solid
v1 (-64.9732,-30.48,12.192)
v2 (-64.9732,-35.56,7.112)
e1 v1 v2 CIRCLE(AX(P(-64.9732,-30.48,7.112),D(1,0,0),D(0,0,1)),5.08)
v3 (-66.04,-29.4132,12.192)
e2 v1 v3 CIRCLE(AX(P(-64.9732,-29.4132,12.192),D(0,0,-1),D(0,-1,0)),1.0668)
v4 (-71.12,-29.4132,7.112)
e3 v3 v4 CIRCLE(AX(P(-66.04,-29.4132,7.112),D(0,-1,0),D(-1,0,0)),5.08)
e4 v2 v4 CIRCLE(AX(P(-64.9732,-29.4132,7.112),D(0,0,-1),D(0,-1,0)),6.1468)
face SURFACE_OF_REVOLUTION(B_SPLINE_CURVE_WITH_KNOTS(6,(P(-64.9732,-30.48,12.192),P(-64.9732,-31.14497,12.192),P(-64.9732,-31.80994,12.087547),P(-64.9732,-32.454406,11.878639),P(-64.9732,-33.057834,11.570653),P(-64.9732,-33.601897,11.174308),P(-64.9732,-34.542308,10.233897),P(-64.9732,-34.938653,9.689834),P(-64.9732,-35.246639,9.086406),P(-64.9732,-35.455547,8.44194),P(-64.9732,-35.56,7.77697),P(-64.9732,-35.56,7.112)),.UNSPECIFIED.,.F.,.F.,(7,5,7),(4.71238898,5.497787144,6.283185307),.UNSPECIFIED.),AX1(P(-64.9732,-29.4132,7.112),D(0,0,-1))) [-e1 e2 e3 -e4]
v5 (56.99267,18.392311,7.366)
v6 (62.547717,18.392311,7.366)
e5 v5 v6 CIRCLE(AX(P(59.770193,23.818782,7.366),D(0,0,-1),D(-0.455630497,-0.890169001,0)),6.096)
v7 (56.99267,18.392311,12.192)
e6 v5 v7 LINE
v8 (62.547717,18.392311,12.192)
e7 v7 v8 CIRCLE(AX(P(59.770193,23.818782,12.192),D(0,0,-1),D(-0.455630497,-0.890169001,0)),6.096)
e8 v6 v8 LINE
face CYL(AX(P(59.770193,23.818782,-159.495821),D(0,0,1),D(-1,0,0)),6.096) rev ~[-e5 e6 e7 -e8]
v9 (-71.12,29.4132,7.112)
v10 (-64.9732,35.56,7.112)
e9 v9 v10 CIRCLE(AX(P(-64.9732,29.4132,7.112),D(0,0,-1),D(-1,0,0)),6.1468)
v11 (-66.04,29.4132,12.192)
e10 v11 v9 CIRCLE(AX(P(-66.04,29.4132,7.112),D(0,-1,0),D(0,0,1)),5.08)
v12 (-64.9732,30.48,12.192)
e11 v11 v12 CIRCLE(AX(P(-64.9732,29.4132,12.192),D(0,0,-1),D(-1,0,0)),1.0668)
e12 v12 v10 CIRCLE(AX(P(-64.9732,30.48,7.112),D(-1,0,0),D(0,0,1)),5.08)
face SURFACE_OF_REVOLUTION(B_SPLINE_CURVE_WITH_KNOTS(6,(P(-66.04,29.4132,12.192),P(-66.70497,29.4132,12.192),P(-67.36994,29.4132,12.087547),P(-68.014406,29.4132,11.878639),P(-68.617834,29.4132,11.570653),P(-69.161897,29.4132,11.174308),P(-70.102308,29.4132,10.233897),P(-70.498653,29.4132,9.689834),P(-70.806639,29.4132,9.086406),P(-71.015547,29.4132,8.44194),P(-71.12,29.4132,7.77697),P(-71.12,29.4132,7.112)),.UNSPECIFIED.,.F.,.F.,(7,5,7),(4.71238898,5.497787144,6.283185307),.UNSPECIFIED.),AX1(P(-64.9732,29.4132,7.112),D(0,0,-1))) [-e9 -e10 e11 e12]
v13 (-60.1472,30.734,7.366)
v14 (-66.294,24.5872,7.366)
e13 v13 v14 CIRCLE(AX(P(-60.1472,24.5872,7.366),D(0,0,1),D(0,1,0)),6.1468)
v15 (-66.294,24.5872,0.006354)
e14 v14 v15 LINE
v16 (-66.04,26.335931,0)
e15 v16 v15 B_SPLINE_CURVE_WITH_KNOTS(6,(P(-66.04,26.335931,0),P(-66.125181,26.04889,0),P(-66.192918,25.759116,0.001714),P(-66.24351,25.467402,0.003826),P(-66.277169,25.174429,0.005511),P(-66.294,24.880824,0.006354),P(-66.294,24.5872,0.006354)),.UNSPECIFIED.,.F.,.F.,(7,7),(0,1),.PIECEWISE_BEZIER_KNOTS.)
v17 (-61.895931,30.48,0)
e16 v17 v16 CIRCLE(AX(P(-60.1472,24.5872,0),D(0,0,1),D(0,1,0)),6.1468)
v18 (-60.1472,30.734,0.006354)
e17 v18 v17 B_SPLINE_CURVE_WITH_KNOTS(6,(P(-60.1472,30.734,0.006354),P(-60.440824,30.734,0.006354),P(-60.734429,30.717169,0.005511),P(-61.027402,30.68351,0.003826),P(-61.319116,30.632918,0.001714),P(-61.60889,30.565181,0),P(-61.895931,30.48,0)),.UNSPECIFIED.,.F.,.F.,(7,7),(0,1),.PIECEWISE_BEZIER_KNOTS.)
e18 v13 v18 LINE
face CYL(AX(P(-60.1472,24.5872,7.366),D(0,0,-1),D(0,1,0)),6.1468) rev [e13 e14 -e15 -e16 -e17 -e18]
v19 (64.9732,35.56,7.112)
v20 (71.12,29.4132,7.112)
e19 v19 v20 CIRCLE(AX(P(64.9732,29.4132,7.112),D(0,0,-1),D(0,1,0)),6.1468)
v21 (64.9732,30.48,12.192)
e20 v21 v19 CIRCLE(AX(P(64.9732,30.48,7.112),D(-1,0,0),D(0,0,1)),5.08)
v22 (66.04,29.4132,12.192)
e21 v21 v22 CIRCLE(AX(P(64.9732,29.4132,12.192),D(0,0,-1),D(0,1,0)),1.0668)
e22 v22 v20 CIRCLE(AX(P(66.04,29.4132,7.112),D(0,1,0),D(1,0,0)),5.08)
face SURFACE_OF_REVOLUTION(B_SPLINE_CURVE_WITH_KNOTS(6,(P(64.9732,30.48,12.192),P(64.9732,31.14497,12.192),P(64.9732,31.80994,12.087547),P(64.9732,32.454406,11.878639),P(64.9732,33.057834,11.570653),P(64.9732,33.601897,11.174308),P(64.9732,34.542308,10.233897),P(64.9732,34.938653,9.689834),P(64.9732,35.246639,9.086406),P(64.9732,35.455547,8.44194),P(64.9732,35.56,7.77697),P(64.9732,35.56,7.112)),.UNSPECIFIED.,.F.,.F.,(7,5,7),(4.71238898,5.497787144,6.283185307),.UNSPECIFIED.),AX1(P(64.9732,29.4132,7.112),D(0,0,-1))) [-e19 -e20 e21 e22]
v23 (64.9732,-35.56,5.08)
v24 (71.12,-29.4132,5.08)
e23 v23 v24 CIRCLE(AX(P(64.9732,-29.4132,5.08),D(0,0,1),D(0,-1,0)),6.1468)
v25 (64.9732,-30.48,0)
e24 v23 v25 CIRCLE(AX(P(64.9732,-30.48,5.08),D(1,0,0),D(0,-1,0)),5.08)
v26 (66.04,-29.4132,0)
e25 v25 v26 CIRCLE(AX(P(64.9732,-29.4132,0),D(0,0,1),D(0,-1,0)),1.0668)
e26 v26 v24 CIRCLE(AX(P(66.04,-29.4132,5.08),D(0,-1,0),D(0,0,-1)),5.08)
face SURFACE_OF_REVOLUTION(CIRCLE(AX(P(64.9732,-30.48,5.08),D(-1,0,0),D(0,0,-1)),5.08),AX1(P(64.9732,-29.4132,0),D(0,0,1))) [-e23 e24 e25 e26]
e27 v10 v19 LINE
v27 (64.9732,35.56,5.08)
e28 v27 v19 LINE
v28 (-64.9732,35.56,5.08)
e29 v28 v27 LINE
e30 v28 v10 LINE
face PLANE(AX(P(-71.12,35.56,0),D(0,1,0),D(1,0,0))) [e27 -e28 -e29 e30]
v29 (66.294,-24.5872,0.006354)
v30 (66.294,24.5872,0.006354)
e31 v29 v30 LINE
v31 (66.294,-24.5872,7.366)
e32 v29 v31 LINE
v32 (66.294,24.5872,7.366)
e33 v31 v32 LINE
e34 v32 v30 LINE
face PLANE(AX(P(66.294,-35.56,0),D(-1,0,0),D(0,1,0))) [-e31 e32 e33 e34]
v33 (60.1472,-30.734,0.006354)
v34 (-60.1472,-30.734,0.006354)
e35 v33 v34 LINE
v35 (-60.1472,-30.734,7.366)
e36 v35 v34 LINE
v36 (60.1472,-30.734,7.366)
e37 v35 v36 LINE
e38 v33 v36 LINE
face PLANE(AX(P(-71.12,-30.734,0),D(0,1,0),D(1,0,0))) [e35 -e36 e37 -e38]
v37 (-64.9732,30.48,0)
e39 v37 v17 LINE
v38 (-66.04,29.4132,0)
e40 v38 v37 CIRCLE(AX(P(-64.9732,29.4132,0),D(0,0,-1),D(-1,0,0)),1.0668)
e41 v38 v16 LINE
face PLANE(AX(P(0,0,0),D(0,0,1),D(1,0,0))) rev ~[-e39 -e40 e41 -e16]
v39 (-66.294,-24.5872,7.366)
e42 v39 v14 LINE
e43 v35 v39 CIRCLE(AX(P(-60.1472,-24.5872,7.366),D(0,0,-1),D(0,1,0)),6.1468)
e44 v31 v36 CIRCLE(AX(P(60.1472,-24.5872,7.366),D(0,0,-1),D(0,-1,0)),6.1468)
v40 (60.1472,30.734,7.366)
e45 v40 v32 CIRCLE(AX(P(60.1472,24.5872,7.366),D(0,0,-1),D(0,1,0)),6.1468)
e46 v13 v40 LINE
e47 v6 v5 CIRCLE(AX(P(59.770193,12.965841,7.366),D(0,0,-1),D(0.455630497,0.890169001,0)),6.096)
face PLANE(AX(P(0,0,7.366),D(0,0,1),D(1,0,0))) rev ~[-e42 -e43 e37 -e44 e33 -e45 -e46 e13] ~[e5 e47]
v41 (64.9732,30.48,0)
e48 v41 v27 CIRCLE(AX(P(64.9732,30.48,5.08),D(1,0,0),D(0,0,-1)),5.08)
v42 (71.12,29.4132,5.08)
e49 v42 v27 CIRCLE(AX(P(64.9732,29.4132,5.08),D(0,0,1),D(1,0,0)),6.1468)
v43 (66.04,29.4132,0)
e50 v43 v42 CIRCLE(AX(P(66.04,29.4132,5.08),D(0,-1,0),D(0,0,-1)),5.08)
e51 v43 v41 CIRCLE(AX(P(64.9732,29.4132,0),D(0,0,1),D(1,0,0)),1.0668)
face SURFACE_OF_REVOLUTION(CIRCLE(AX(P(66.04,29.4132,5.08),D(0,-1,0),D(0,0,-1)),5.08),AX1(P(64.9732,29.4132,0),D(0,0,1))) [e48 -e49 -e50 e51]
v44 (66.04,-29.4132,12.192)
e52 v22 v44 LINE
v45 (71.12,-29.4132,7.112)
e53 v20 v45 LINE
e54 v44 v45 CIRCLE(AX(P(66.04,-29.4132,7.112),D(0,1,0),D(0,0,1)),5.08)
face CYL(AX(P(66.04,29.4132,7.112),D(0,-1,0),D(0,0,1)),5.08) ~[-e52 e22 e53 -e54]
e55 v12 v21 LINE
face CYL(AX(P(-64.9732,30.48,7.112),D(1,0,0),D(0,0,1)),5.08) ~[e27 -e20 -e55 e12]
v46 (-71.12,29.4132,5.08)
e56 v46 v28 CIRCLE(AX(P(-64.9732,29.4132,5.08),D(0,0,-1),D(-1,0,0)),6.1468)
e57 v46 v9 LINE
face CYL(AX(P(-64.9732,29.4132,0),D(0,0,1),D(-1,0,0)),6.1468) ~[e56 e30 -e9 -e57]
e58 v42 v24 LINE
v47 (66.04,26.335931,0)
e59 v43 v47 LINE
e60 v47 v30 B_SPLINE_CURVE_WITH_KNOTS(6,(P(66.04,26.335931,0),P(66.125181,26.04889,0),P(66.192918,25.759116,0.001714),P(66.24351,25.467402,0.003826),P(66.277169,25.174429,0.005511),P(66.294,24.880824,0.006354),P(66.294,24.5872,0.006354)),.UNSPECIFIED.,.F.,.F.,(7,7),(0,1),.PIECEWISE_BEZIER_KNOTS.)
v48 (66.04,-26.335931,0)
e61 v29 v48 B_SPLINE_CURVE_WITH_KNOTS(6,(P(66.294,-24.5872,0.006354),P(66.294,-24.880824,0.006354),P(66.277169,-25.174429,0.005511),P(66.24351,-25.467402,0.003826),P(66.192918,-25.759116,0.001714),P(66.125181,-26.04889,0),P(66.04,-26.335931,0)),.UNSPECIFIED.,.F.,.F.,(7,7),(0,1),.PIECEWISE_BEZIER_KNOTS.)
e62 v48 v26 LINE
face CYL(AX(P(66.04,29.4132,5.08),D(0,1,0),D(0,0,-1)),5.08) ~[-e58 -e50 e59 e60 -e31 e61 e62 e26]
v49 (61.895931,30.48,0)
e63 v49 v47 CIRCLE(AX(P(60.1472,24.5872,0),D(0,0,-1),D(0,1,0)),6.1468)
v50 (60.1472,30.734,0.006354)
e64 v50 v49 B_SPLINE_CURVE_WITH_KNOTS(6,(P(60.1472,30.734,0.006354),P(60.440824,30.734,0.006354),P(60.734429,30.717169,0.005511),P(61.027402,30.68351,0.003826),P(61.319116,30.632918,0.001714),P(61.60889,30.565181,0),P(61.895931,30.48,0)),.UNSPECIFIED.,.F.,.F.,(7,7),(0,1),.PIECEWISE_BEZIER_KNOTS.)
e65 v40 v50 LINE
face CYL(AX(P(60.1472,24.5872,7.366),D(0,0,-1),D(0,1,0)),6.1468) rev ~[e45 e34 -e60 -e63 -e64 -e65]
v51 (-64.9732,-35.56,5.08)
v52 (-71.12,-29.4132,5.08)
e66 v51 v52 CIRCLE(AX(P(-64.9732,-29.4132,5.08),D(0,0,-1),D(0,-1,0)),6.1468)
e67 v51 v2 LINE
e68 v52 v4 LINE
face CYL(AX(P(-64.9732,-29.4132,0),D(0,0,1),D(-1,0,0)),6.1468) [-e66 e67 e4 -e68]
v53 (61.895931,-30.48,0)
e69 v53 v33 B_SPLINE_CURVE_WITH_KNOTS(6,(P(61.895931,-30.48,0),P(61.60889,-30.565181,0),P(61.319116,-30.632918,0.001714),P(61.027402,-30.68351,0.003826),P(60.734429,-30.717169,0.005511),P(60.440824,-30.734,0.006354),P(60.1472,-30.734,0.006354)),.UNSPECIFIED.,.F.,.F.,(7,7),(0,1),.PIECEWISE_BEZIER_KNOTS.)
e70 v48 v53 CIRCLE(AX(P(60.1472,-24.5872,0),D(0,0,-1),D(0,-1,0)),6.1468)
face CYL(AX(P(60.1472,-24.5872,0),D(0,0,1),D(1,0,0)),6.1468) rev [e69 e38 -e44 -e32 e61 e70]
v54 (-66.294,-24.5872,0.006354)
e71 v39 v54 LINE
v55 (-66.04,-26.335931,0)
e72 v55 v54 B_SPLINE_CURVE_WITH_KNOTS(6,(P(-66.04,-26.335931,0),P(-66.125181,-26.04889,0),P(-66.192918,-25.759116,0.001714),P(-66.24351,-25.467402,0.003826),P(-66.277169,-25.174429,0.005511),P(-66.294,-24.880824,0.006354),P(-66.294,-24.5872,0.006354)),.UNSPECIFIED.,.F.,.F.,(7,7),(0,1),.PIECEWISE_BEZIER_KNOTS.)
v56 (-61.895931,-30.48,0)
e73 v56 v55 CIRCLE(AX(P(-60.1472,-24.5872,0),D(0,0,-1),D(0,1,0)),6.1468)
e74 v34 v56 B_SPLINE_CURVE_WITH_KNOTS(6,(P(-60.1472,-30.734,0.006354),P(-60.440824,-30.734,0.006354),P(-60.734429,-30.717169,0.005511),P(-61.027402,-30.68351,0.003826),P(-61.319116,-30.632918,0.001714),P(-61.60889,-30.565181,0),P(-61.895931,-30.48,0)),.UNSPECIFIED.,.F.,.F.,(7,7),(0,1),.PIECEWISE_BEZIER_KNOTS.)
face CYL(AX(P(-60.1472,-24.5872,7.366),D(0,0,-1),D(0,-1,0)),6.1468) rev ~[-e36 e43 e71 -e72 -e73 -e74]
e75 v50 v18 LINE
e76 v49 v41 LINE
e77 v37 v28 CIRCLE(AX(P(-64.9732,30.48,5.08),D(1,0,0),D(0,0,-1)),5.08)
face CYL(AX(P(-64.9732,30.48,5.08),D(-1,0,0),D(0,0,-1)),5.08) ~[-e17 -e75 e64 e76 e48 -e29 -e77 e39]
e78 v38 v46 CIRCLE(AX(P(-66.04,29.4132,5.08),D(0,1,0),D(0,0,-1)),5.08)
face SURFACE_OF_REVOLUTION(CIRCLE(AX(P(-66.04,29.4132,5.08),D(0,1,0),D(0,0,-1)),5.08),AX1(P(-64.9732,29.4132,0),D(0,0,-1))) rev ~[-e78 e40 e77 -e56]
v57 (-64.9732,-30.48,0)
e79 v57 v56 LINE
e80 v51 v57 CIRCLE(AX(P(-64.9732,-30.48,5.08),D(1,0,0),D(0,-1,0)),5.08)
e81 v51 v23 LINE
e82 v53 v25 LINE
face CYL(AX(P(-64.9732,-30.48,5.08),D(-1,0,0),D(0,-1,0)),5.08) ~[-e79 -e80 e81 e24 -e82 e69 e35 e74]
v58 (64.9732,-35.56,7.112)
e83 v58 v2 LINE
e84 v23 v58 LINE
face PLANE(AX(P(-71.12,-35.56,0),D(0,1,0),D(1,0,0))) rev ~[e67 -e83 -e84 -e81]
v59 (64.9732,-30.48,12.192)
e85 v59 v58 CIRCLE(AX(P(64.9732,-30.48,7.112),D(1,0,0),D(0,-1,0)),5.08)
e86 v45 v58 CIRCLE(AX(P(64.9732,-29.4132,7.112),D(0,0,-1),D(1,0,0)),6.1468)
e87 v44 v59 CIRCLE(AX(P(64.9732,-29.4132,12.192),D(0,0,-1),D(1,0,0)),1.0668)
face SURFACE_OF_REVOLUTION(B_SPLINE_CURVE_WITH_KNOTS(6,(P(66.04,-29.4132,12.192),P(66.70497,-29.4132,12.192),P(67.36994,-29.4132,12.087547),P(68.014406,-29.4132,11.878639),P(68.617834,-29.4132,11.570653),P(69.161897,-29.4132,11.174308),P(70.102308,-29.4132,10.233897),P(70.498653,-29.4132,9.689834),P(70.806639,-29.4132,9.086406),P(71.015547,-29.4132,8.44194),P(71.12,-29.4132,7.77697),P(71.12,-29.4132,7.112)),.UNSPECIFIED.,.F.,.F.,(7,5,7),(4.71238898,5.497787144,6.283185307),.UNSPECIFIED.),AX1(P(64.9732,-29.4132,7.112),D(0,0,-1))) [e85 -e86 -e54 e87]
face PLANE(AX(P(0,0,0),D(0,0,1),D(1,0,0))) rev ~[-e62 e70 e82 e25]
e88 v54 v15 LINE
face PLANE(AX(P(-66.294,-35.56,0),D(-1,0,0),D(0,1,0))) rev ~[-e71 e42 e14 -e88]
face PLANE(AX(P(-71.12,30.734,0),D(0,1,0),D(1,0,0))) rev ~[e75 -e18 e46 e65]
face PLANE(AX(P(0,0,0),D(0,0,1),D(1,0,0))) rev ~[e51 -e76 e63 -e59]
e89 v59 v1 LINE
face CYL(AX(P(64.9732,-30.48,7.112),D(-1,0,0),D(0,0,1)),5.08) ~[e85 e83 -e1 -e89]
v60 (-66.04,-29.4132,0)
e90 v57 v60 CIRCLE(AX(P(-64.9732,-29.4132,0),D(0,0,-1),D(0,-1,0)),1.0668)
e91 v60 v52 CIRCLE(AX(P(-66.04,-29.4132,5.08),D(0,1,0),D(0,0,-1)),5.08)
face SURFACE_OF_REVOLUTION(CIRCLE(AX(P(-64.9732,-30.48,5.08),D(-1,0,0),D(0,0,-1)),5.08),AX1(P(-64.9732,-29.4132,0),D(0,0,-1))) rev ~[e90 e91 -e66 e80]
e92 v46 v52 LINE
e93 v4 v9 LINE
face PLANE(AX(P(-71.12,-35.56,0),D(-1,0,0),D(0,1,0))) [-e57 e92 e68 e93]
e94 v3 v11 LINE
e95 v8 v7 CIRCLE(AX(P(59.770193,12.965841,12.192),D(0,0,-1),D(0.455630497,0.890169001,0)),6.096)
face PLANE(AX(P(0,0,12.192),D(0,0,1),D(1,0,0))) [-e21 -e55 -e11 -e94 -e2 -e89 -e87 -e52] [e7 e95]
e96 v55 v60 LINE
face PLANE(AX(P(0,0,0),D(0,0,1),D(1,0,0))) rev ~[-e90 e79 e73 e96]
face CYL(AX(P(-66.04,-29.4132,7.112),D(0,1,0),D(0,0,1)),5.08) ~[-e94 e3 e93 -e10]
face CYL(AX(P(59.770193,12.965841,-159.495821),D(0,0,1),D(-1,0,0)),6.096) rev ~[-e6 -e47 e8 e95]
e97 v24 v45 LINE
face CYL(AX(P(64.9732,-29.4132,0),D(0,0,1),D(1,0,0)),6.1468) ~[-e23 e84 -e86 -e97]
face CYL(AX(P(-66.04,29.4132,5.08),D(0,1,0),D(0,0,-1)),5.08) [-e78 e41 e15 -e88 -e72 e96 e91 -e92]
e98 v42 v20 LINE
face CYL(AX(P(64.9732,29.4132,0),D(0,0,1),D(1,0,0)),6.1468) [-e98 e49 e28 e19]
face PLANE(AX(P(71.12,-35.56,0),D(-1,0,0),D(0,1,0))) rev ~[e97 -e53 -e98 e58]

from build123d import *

# Parameters (mm, degrees)
F0_W         = 142.24
F0_H         = 71.12
F1_DEPTH     = 12.192
F3_T         = -4.826
F4_D         = 12.192
F5_R         = 6.1468
F6_T1_DEPTH  = 129.9464
F6_T3_DEPTH  = 58.8264
F6_T6_ANGLE  = 90
F6_T8_ANGLE  = 90
F6_T10_ANGLE = 90
F6_T12_ANGLE = 90
F7_R         = 5.08


# Not quite as in the source:
# - a fillet or chamfer that OpenCascade refuses, or shapes differently, is made with other operations: its cross-section is extruded or revolved along the edge and cut away or added
# - a feature names something its author has since deleted; it is built from what else it names


with BuildPart() as f1:
    # F0 (on Top) → F1 (new body)
    with BuildSketch(Plane.XY):
        Rectangle(F0_W, F0_H)
    extrude(amount=F1_DEPTH)

    # F3
    f3_openings = [f1.faces().sort_by_distance(p)[0] for p in [
        (0, 0, 0),
    ]]
    offset(amount=F3_T, openings=f3_openings)

    # F4 (through all)
    with Locations(Plane(origin=(0, 0, 0), x_dir=(1, 0, 0), z_dir=(0, 0, -1))):
        with Locations((59.7701932977, -12.9658412188), (59.7701932977, -23.8187816803)):
            Hole(F4_D / 2)

    # F5
    f5_edges = [f1.edges().sort_by_distance(p)[0] for p in [
        (66.294, -30.734, 3.683),
        (66.294, 30.734, 3.683),
        (-66.294, 30.734, 3.683),
        (-66.294, -30.734, 3.683),
        (-71.12, 35.56, 6.096),
        (-71.12, -35.56, 6.096),
        (71.12, -35.56, 6.096),
        (71.12, 35.56, 6.096),
    ]]
    fillet(f5_edges, radius=F5_R)

    # F6: fillet of radius 5.08 on 1 edges, made by hand

    # F6_s2 → F6_t1 (cut)
    with BuildSketch(Plane.YZ.offset(-64.9732)):
        with BuildLine():
            ThreePointArc((30.48, 0), (34.0721024484, 1.4878975516), (35.56, 5.08))
            Line((35.56, 5.08), (35.56, 0))
            Line((35.56, 0), (30.48, 0))
        make_face()
        with BuildLine():
            ThreePointArc((-35.56, 5.08), (-34.0721024484, 1.4878975516), (-30.48, 0))
            Line((-30.48, 0), (-35.56, 0))
            Line((-35.56, 0), (-35.56, 5.08))
        make_face()
    extrude(amount=F6_T1_DEPTH, mode=Mode.SUBTRACT)

    # F6_s4 → F6_t3 (cut)
    with BuildSketch(Plane.XZ.offset(-29.4132)):
        with BuildLine():
            ThreePointArc((-66.04, 0), (-69.6321024484, 1.4878975516), (-71.12, 5.08))
            Line((-71.12, 5.08), (-71.12, 0))
            Line((-71.12, 0), (-66.04, 0))
        make_face()
        with BuildLine():
            ThreePointArc((66.04, 0), (69.6321024484, 1.4878975516), (71.12, 5.08))
            Line((71.12, 5.08), (71.12, 0))
            Line((71.12, 0), (66.04, 0))
        make_face()
    extrude(amount=F6_T3_DEPTH, mode=Mode.SUBTRACT)

    # F6_s5 → F6_t6 (revolve, cut)
    with BuildSketch(Plane.XZ.offset(-29.4132)):
        with BuildLine():
            ThreePointArc((66.04, 0), (69.6321024484, 1.4878975516), (71.12, 5.08))
            Line((71.12, 5.08), (71.12, 0))
            Line((71.12, 0), (66.04, 0))
        make_face()
    revolve(axis=Axis((64.9732, 29.4132, 0), (0, 0, 1)), revolution_arc=F6_T6_ANGLE, mode=Mode.SUBTRACT)

    # F6_s7 → F6_t8 (revolve, cut)
    with BuildSketch(Plane.XZ.offset(-29.4132)):
        with BuildLine():
            ThreePointArc((-66.04, 0), (-69.6321024484, 1.4878975516), (-71.12, 5.08))
            Line((-71.12, 5.08), (-71.12, 0))
            Line((-71.12, 0), (-66.04, 0))
        make_face()
    revolve(axis=Axis((-64.9732, 29.4132, 0), (0, 0, -1)), revolution_arc=F6_T8_ANGLE, mode=Mode.SUBTRACT)

    # F6_s9 → F6_t10 (revolve, cut)
    with BuildSketch(Plane.YZ.offset(-64.9732)):
        with BuildLine():
            ThreePointArc((-30.48, 0), (-34.0721024484, 1.4878975516), (-35.56, 5.08))
            Line((-35.56, 5.08), (-35.56, 0))
            Line((-35.56, 0), (-30.48, 0))
        make_face()
    revolve(axis=Axis((-64.9732, -29.4132, 0), (0, 0, -1)), revolution_arc=F6_T10_ANGLE, mode=Mode.SUBTRACT)

    # F6_s11 → F6_t12 (revolve, cut)
    with BuildSketch(Plane.YZ.offset(64.9732)):
        with BuildLine():
            ThreePointArc((-30.48, 0), (-34.0721024484, 1.4878975516), (-35.56, 5.08))
            Line((-35.56, 5.08), (-35.56, 0))
            Line((-35.56, 0), (-30.48, 0))
        make_face()
    revolve(axis=Axis((64.9732, -29.4132, 0), (0, 0, 1)), revolution_arc=F6_T12_ANGLE, mode=Mode.SUBTRACT)

    # F7
    f7_edges = [f1.edges().sort_by_distance(p)[0] for p in [
        (0, 35.56, 12.192),
        (69.319644, -33.759644, 12.192),
        (0, -35.56, 12.192),
        (-69.319644, -33.759644, 12.192),
        (-71.12, 0, 12.192),
        (71.12, 0, 12.192),
        (-69.319644, 33.759644, 12.192),
        (69.319644, 33.759644, 12.192),
    ]]
    fillet(f7_edges, radius=F7_R)


solid = f1.part
